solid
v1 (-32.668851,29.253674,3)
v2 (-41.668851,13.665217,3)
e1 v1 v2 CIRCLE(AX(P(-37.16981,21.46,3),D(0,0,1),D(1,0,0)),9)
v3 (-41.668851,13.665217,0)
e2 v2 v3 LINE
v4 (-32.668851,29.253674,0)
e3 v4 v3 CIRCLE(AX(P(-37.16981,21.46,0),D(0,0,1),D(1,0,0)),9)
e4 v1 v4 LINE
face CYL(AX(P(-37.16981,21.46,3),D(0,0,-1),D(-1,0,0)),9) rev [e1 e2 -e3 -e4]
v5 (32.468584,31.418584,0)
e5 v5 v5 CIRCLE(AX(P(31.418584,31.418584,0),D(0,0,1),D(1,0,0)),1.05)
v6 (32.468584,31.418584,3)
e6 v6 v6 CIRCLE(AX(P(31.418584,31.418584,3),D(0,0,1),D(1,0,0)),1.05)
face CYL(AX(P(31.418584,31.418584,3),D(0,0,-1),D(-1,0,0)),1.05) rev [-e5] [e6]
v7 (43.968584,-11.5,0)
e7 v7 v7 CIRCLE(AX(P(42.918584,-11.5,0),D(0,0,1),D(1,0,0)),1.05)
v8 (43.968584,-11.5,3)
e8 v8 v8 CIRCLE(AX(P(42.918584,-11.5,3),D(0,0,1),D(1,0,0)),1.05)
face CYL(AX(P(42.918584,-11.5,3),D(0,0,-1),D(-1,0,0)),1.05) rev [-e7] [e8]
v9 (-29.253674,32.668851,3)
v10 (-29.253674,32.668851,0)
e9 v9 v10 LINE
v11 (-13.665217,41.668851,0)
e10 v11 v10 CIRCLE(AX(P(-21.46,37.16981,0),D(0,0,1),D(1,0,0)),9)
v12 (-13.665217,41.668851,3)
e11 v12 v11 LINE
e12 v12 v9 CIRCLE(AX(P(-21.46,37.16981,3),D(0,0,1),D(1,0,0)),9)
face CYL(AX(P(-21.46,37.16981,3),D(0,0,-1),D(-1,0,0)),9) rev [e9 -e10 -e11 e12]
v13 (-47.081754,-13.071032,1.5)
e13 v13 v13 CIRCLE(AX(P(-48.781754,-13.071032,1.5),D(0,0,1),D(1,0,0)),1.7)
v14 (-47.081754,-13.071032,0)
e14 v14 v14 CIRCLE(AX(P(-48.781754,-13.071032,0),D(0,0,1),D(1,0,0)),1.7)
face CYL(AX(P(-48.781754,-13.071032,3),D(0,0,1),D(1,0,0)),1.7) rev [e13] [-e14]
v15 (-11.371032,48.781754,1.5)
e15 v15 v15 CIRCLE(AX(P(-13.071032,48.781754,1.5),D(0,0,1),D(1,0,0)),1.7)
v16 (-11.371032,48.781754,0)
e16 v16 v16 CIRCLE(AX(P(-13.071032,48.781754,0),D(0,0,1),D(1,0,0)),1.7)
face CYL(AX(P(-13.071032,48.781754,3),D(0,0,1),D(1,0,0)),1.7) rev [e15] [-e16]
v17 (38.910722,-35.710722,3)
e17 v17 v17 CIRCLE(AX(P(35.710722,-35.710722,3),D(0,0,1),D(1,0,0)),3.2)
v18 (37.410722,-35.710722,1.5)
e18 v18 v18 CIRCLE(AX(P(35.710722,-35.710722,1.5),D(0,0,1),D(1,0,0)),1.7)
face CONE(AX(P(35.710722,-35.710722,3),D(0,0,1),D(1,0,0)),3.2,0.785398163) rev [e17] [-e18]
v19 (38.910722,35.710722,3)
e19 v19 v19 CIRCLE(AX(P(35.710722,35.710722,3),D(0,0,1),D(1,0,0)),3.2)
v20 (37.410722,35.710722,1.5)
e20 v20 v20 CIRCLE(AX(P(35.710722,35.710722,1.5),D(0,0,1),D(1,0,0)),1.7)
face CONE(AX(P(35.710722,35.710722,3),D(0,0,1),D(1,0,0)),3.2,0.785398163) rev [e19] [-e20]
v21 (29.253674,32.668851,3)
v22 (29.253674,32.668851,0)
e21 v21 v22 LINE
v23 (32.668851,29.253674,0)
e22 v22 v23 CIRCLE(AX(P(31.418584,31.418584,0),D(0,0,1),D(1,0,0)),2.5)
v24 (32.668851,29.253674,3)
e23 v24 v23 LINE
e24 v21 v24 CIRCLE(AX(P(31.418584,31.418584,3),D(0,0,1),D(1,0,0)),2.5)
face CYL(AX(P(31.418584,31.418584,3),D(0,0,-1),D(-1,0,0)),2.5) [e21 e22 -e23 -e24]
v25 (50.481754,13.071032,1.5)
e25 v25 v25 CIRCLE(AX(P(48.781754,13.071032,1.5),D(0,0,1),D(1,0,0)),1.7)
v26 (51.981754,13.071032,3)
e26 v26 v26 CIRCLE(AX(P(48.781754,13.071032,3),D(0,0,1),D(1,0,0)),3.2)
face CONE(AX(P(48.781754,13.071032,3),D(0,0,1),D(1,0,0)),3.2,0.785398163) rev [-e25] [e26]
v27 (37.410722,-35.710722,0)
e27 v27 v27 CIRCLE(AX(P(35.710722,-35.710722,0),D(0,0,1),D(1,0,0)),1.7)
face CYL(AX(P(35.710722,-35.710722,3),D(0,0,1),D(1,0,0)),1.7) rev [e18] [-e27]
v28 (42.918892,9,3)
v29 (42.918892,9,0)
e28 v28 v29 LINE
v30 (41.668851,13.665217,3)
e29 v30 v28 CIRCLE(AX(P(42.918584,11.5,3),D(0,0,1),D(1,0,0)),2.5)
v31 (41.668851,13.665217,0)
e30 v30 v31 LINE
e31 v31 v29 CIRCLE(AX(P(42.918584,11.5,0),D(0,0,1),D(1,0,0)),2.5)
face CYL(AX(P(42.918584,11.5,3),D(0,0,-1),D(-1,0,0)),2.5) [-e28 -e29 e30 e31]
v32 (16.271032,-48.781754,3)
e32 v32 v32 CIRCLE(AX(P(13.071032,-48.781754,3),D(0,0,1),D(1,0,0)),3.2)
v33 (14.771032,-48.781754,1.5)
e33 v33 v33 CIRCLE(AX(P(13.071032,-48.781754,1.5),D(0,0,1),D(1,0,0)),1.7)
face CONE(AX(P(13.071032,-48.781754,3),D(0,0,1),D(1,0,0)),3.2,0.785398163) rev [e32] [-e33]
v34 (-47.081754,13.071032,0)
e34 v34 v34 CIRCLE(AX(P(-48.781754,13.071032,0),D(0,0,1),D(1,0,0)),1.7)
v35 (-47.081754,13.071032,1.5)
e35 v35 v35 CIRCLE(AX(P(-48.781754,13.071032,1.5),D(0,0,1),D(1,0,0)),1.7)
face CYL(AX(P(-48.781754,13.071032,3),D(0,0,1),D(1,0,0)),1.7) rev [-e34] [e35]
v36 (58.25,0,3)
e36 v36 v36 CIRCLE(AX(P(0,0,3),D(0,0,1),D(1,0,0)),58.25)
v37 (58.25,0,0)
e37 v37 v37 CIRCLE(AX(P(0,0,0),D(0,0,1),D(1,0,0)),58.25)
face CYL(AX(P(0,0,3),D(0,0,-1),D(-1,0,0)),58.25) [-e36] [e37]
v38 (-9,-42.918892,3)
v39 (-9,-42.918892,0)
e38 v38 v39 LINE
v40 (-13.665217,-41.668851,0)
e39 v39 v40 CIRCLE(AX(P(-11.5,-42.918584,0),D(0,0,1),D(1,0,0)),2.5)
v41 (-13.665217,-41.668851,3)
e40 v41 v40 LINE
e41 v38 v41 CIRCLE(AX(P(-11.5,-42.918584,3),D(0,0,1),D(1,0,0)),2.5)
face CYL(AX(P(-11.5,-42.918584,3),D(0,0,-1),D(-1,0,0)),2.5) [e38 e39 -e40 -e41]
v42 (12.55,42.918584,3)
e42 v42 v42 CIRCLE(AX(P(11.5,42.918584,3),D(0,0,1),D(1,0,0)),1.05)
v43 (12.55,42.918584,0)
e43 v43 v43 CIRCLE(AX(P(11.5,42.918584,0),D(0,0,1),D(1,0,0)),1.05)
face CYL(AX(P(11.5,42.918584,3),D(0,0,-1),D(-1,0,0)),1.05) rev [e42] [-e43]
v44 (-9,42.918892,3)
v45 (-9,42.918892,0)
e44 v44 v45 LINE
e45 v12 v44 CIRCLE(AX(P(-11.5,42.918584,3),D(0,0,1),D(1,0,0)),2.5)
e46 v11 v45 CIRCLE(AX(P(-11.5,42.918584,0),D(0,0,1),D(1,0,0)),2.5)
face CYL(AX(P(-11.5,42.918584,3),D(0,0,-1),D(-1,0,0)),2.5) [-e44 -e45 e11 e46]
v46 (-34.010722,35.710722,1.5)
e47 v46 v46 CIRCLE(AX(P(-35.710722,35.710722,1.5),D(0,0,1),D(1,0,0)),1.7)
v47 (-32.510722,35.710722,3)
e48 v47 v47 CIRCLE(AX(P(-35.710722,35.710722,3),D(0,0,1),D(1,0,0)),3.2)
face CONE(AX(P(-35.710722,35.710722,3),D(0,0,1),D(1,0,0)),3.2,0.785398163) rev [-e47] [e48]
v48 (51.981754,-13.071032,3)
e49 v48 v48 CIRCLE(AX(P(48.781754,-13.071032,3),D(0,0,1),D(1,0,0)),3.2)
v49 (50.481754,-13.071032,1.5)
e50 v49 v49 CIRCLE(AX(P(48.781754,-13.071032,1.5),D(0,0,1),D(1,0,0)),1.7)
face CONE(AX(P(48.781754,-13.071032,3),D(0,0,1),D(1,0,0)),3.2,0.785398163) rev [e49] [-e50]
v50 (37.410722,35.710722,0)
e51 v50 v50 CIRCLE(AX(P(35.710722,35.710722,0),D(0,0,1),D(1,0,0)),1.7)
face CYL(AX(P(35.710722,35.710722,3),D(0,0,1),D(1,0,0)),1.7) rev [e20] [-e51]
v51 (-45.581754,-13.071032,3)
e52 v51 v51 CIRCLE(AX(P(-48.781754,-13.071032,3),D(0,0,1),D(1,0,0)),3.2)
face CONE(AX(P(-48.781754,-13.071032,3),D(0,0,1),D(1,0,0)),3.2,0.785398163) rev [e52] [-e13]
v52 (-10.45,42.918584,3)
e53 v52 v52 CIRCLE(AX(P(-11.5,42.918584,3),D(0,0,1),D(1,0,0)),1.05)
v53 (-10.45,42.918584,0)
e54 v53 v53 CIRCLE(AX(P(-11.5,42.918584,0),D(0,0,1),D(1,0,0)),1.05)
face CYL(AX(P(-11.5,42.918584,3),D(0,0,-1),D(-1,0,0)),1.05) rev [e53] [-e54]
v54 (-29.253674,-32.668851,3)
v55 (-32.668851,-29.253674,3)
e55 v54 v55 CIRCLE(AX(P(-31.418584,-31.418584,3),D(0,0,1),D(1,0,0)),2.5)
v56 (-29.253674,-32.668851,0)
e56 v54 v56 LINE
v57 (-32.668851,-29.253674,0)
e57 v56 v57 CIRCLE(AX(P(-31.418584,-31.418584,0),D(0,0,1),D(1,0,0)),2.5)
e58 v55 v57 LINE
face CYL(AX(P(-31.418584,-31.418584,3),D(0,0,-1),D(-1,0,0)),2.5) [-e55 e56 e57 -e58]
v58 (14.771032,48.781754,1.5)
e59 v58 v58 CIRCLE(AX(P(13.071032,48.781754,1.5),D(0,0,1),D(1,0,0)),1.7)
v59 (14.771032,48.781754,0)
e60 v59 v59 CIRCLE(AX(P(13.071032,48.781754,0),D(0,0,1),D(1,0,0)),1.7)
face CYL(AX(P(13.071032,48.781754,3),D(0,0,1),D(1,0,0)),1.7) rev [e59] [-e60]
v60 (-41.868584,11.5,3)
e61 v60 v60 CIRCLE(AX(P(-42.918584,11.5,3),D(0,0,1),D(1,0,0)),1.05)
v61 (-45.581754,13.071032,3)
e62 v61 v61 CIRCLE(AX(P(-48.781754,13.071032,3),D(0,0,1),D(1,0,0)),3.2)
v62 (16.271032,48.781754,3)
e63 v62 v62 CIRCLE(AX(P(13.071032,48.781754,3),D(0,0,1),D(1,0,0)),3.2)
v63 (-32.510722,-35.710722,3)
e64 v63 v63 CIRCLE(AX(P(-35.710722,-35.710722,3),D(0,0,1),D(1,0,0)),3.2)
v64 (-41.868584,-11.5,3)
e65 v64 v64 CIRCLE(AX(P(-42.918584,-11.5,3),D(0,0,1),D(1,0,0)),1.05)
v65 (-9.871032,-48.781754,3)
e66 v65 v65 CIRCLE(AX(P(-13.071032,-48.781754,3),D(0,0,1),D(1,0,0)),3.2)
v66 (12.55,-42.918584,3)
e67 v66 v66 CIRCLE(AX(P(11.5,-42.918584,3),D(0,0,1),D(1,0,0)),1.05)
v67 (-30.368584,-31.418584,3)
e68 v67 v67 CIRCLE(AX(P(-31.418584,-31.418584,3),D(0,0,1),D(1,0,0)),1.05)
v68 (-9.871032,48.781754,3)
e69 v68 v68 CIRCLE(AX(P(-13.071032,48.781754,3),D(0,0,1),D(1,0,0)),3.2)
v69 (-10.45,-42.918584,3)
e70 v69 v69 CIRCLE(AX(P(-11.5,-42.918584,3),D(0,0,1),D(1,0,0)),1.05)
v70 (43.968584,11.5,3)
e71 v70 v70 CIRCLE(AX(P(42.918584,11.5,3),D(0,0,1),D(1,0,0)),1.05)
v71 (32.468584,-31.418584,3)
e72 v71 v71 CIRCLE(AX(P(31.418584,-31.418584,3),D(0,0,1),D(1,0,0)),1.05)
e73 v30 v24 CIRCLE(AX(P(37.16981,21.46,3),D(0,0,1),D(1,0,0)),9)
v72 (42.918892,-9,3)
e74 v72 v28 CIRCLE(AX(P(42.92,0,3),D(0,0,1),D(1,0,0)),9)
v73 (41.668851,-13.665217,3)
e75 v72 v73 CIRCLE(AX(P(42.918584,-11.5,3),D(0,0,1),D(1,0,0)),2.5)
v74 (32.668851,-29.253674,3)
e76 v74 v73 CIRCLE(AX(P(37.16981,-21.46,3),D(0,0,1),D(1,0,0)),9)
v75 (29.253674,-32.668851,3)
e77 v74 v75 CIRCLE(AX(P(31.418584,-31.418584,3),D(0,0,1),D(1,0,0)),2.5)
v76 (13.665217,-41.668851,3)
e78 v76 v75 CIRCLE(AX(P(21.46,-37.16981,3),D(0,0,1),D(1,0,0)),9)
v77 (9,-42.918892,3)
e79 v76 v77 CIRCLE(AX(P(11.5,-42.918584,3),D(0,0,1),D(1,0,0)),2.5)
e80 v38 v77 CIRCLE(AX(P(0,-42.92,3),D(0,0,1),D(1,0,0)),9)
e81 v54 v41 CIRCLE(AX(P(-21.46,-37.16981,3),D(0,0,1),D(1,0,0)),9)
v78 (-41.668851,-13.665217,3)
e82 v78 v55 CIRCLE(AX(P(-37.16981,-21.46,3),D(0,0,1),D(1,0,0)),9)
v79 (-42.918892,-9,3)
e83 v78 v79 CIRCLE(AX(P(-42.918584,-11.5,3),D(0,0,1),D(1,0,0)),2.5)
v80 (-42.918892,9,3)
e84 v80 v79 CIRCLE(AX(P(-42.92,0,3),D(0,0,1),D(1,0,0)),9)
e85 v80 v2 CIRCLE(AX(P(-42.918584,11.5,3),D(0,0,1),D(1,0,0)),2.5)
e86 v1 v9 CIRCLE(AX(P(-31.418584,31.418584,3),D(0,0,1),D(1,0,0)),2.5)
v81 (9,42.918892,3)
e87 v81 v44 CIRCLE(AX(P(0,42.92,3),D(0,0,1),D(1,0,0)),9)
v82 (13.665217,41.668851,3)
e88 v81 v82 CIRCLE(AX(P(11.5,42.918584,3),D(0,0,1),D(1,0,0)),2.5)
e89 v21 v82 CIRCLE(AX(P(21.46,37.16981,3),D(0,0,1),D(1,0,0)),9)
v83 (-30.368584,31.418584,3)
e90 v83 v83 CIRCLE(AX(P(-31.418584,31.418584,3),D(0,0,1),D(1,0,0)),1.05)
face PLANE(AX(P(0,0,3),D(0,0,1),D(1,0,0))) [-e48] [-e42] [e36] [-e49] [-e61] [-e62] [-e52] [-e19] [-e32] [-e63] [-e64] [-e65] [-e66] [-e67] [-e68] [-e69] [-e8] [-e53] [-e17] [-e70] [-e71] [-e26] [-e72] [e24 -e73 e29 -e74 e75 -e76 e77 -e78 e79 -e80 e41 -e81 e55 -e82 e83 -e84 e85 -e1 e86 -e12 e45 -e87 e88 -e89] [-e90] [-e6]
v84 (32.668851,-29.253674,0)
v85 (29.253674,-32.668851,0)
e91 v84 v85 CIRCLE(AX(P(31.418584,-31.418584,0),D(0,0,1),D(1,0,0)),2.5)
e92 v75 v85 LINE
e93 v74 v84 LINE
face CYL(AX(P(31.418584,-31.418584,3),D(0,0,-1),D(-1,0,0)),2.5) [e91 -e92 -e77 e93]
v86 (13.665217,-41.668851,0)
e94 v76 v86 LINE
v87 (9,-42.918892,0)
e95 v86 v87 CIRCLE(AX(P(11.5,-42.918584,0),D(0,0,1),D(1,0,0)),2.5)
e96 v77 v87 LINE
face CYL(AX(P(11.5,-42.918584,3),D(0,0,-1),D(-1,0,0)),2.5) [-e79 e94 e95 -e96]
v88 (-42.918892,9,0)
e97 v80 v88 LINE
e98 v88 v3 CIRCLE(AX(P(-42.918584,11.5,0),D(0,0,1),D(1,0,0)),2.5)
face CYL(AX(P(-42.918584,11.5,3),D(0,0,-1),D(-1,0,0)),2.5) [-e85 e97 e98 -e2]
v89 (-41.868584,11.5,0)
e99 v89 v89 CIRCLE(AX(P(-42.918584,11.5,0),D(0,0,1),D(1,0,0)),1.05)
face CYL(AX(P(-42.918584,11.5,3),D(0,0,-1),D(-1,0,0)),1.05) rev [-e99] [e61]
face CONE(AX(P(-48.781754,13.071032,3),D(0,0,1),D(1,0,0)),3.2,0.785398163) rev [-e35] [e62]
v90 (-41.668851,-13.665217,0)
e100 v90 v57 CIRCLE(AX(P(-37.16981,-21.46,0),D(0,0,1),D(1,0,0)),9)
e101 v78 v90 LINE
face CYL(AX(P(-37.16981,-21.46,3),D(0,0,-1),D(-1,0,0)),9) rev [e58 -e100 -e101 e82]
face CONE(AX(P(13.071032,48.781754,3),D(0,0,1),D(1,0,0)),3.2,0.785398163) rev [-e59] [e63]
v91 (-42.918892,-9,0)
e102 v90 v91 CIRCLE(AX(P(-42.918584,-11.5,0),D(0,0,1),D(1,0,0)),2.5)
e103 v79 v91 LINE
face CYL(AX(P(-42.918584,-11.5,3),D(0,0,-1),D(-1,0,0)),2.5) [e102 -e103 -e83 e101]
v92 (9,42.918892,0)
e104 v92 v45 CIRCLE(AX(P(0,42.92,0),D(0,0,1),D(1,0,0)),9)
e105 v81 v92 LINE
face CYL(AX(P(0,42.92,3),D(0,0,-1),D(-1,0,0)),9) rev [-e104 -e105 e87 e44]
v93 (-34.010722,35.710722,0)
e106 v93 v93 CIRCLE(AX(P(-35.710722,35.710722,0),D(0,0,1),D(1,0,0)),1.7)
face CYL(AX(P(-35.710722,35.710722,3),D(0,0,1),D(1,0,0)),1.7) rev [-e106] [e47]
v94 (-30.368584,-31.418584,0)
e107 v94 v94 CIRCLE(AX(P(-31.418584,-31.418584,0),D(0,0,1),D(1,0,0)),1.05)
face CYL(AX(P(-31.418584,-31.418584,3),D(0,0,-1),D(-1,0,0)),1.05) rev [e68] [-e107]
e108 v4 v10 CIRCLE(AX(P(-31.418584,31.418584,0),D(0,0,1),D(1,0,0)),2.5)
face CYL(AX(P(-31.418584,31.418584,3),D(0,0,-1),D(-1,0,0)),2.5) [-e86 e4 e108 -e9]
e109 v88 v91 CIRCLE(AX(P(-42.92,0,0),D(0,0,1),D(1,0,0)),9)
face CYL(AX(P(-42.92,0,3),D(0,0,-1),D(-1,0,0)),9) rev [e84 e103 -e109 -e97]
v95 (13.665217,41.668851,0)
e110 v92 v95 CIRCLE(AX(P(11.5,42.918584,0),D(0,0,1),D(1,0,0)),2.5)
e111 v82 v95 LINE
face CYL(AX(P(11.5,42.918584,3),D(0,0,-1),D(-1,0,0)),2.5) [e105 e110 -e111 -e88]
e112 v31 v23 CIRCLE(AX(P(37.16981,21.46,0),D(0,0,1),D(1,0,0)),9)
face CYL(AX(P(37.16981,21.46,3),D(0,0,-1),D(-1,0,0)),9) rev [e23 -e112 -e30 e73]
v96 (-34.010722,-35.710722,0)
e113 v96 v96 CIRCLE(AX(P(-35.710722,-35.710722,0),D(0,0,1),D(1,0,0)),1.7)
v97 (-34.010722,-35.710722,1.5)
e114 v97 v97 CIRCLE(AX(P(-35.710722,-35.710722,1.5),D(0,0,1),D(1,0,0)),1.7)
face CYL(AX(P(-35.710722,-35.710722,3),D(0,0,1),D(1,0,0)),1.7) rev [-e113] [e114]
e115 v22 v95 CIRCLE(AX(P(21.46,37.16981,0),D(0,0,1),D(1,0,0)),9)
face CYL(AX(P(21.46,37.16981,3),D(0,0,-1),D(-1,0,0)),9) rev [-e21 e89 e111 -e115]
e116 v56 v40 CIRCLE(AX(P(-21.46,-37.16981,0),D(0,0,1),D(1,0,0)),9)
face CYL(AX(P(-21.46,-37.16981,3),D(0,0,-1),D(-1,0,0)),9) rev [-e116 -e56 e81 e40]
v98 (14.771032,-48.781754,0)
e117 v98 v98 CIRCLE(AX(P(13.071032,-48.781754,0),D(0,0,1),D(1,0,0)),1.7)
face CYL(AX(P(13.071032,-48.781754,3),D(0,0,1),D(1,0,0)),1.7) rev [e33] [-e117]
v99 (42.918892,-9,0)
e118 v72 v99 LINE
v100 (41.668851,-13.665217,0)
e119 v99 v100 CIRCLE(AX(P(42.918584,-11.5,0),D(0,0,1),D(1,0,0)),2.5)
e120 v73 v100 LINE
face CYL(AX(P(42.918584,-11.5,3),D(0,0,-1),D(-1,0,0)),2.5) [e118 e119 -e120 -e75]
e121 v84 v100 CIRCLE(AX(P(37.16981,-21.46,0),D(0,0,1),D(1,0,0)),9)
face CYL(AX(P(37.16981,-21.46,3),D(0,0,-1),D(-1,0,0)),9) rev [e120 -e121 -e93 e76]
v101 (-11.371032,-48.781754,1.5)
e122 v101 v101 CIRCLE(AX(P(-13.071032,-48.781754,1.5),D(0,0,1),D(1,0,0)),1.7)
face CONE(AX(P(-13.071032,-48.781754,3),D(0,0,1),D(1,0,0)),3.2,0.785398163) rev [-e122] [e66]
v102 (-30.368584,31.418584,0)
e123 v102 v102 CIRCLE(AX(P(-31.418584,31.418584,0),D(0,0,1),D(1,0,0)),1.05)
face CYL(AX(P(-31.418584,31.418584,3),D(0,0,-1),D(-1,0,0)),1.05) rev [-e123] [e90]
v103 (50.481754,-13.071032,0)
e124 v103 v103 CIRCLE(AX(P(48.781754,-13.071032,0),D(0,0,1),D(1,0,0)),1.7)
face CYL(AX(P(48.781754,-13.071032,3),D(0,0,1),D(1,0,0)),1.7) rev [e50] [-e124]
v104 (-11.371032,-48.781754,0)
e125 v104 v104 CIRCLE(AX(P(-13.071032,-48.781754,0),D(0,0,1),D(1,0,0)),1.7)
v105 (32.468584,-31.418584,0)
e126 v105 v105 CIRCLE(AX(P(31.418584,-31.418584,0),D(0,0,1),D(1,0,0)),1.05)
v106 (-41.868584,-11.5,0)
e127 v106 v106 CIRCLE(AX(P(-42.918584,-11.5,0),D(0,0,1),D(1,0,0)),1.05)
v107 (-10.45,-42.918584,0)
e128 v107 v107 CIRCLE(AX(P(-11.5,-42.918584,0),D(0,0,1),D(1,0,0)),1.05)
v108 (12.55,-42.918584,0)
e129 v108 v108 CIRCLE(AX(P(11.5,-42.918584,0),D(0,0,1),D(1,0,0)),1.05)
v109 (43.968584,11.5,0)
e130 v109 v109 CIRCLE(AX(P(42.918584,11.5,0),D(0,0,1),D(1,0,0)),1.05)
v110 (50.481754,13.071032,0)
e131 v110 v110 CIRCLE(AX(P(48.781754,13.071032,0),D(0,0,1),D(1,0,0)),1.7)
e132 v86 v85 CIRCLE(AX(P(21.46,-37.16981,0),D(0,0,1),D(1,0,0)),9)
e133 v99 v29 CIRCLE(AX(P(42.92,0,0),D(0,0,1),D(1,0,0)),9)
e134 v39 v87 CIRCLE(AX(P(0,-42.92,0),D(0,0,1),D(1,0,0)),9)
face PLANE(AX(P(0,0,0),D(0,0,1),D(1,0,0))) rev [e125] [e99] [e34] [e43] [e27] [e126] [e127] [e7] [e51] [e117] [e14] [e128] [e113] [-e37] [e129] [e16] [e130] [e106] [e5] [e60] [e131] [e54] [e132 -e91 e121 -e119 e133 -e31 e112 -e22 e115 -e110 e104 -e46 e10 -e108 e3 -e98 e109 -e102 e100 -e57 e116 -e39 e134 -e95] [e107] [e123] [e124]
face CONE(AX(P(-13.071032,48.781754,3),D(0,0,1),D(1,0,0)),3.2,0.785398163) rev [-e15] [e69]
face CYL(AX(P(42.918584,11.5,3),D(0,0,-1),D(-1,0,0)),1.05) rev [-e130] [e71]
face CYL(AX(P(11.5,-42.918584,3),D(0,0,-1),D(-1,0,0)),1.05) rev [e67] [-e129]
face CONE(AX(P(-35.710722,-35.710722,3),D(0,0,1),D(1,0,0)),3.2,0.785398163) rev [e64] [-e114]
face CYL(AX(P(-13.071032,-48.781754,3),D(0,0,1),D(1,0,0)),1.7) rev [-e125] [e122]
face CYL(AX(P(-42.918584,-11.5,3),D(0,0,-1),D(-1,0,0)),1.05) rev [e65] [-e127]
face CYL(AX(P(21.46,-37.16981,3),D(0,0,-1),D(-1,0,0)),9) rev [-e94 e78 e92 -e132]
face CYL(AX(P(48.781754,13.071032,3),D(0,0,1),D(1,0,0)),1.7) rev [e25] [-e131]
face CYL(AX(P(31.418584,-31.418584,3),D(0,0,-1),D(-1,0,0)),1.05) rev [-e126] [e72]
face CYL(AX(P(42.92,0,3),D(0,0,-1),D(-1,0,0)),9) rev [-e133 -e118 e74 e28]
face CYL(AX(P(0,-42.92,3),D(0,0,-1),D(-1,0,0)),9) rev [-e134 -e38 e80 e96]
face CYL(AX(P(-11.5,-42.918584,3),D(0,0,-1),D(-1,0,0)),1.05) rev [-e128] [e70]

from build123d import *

# Parameters (mm, degrees)
EXTRUDE_1_OUTLINE_R      = 58.25
EXTRUDE_1_OUTLINE_R_2    = 1.55
EXTRUDE_1_OUTLINE_R_3    = 1.05
EXTRUDE_1_OUTLINE_R_4    = 1.549999992
EXTRUDE_1_OUTLINE_R_5    = 1.550000008
EXTRUDE_1_DEPTH          = 3
PATTERN_CIRCULAR_1_COUNT = 12


# Read off the part's stored shape, not the designer's step: 凸台-拉伸1
with BuildPart() as part:
    # 凸台-拉伸1 outline → 凸台-拉伸1 (new body)
    with BuildSketch(Plane.XY):
        Circle(EXTRUDE_1_OUTLINE_R)
        with Locations((-35.710722211, -35.710722211)):
            Circle(EXTRUDE_1_OUTLINE_R_2, mode=Mode.SUBTRACT)
        with Locations((-31.418584049, -31.418584049)):
            Circle(EXTRUDE_1_OUTLINE_R_3, mode=Mode.SUBTRACT)
        with Locations((-13.071031517, -48.781753727)):
            Circle(EXTRUDE_1_OUTLINE_R_2, mode=Mode.SUBTRACT)
        with Locations((-11.499999913, -42.918583962)):
            Circle(EXTRUDE_1_OUTLINE_R_3, mode=Mode.SUBTRACT)
        with Locations((-48.781753727, -13.071031517)):
            Circle(EXTRUDE_1_OUTLINE_R_2, mode=Mode.SUBTRACT)
        with Locations((-42.918583962, -11.499999913)):
            Circle(EXTRUDE_1_OUTLINE_R_3, mode=Mode.SUBTRACT)
        with Locations((13.071031517, -48.781753727)):
            Circle(EXTRUDE_1_OUTLINE_R_4, mode=Mode.SUBTRACT)
        with Locations((11.499999913, -42.918583962)):
            Circle(EXTRUDE_1_OUTLINE_R_3, mode=Mode.SUBTRACT)
        with Locations((35.710722211, -35.710722211)):
            Circle(EXTRUDE_1_OUTLINE_R_2, mode=Mode.SUBTRACT)
        with Locations((31.418584049, -31.418584049)):
            Circle(EXTRUDE_1_OUTLINE_R_3, mode=Mode.SUBTRACT)
        with Locations((42.918583962, -11.499999913)):
            Circle(EXTRUDE_1_OUTLINE_R_3, mode=Mode.SUBTRACT)
        with Locations((48.781753727, -13.071031517)):
            Circle(EXTRUDE_1_OUTLINE_R_2, mode=Mode.SUBTRACT)
        with Locations((-48.781753727, 13.071031517)):
            Circle(EXTRUDE_1_OUTLINE_R_2, mode=Mode.SUBTRACT)
        with Locations((-42.918583962, 11.499999913)):
            Circle(EXTRUDE_1_OUTLINE_R_3, mode=Mode.SUBTRACT)
        with Locations((-31.418584049, 31.418584049)):
            Circle(EXTRUDE_1_OUTLINE_R_3, mode=Mode.SUBTRACT)
        with Locations((-35.710722211, 35.710722211)):
            Circle(EXTRUDE_1_OUTLINE_R_2, mode=Mode.SUBTRACT)
        with Locations((-11.499999913, 42.918583962)):
            Circle(EXTRUDE_1_OUTLINE_R_3, mode=Mode.SUBTRACT)
        with Locations((-13.071031517, 48.781753727)):
            Circle(EXTRUDE_1_OUTLINE_R_5, mode=Mode.SUBTRACT)
        with BuildLine():
            ThreePointArc((-42.918891796, 8.999999932), (-40.503769396, 10.8529523), (-41.668850564, 13.665217323))
            ThreePointArc((-41.668850564, 13.665217323), (-44.964038964, 25.96), (-32.668850632, 29.253674473))
            ThreePointArc((-32.668850632, 29.253674473), (-29.650817096, 29.650817096), (-29.253674473, 32.668850632))
            ThreePointArc((-29.253674473, 32.668850632), (-25.96, 44.964038964), (-13.665217323, 41.668850564))
            ThreePointArc((-13.665217323, 41.668850564), (-10.852952298, 40.503769388), (-8.999999924, 42.918891796))
            ThreePointArc((-8.999999924, 42.918891796), (0, 51.92), (8.999999932, 42.918891796))
            ThreePointArc((8.999999932, 42.918891796), (10.8529523, 40.503769396), (13.665217323, 41.668850564))
            ThreePointArc((13.665217323, 41.668850564), (25.96, 44.964038964), (29.253674473, 32.668850632))
            ThreePointArc((29.253674473, 32.668850632), (29.650817096, 29.650817096), (32.668850632, 29.253674473))
            ThreePointArc((32.668850632, 29.253674473), (44.964038964, 25.96), (41.668850564, 13.665217323))
            ThreePointArc((41.668850564, 13.665217323), (40.503769396, 10.8529523), (42.918891796, 8.999999932))
            ThreePointArc((42.918891796, 8.999999932), (51.92, 0), (42.918891796, -8.999999932))
            ThreePointArc((42.918891796, -8.999999932), (40.503769396, -10.8529523), (41.668850564, -13.665217323))
            ThreePointArc((41.668850564, -13.665217323), (44.964038964, -25.96), (32.668850632, -29.253674473))
            ThreePointArc((32.668850632, -29.253674473), (29.650817096, -29.650817096), (29.253674473, -32.668850632))
            ThreePointArc((29.253674473, -32.668850632), (25.96, -44.964038964), (13.665217323, -41.668850564))
            ThreePointArc((13.665217323, -41.668850564), (10.852952302, -40.503769404), (8.99999994, -42.918891796))
            ThreePointArc((8.99999994, -42.918891796), (0, -51.92), (-8.999999932, -42.918891796))
            ThreePointArc((-8.999999932, -42.918891796), (-10.8529523, -40.503769396), (-13.665217323, -41.668850564))
            ThreePointArc((-13.665217323, -41.668850564), (-25.96, -44.964038964), (-29.253674473, -32.668850632))
            ThreePointArc((-29.253674473, -32.668850632), (-29.650817096, -29.650817096), (-32.668850632, -29.253674473))
            ThreePointArc((-32.668850632, -29.253674473), (-44.964038964, -25.96), (-41.668850564, -13.665217323))
            ThreePointArc((-41.668850564, -13.665217323), (-40.503769396, -10.8529523), (-42.918891796, -8.999999932))
            ThreePointArc((-42.918891796, -8.999999932), (-51.92, 0), (-42.918891796, 8.999999932))
        make_face(mode=Mode.SUBTRACT)
        with Locations((42.918583962, 11.499999913)):
            Circle(EXTRUDE_1_OUTLINE_R_3, mode=Mode.SUBTRACT)
        with Locations((48.781753727, 13.071031517)):
            Circle(EXTRUDE_1_OUTLINE_R_2, mode=Mode.SUBTRACT)
        with Locations((11.499999913, 42.918583962)):
            Circle(EXTRUDE_1_OUTLINE_R_3, mode=Mode.SUBTRACT)
        with Locations((13.071031517, 48.781753727)):
            Circle(EXTRUDE_1_OUTLINE_R_2, mode=Mode.SUBTRACT)
        with Locations((31.418584049, 31.418584049)):
            Circle(EXTRUDE_1_OUTLINE_R_3, mode=Mode.SUBTRACT)
        with Locations((35.710722211, 35.710722211)):
            Circle(EXTRUDE_1_OUTLINE_R_2, mode=Mode.SUBTRACT)
    extrude(amount=EXTRUDE_1_DEPTH)

    # 草图4 → M3 开槽半沉头螺钉的锥形沉头孔1 (revolve, cut)
    with BuildSketch(Plane(origin=(-13.071031517, 48.781753727, 3), x_dir=(0, -1, 0), z_dir=(1, 0, 0))):
        Polygon((0, 0), (0, 21.021463052), (1.7, 20), (1.7, 1.5), (3.2, 0), align=None)
    hole_wizard_m3_1 = revolve(axis=Axis((-13.071031517, 48.781753727, 9.35), (0, 0, -1)), mode=Mode.SUBTRACT)

    # 阵列(圆周)1: M3 开槽半沉头螺钉的锥形沉头孔1 ×12 about axis
    pattern_circular_1_axis = Axis((0, 0, 0), (0, 0, 1))
    for i in range(1, PATTERN_CIRCULAR_1_COUNT):
        add(hole_wizard_m3_1.rotate(pattern_circular_1_axis, i * 360 / PATTERN_CIRCULAR_1_COUNT), mode=Mode.SUBTRACT)


solid = part.part
